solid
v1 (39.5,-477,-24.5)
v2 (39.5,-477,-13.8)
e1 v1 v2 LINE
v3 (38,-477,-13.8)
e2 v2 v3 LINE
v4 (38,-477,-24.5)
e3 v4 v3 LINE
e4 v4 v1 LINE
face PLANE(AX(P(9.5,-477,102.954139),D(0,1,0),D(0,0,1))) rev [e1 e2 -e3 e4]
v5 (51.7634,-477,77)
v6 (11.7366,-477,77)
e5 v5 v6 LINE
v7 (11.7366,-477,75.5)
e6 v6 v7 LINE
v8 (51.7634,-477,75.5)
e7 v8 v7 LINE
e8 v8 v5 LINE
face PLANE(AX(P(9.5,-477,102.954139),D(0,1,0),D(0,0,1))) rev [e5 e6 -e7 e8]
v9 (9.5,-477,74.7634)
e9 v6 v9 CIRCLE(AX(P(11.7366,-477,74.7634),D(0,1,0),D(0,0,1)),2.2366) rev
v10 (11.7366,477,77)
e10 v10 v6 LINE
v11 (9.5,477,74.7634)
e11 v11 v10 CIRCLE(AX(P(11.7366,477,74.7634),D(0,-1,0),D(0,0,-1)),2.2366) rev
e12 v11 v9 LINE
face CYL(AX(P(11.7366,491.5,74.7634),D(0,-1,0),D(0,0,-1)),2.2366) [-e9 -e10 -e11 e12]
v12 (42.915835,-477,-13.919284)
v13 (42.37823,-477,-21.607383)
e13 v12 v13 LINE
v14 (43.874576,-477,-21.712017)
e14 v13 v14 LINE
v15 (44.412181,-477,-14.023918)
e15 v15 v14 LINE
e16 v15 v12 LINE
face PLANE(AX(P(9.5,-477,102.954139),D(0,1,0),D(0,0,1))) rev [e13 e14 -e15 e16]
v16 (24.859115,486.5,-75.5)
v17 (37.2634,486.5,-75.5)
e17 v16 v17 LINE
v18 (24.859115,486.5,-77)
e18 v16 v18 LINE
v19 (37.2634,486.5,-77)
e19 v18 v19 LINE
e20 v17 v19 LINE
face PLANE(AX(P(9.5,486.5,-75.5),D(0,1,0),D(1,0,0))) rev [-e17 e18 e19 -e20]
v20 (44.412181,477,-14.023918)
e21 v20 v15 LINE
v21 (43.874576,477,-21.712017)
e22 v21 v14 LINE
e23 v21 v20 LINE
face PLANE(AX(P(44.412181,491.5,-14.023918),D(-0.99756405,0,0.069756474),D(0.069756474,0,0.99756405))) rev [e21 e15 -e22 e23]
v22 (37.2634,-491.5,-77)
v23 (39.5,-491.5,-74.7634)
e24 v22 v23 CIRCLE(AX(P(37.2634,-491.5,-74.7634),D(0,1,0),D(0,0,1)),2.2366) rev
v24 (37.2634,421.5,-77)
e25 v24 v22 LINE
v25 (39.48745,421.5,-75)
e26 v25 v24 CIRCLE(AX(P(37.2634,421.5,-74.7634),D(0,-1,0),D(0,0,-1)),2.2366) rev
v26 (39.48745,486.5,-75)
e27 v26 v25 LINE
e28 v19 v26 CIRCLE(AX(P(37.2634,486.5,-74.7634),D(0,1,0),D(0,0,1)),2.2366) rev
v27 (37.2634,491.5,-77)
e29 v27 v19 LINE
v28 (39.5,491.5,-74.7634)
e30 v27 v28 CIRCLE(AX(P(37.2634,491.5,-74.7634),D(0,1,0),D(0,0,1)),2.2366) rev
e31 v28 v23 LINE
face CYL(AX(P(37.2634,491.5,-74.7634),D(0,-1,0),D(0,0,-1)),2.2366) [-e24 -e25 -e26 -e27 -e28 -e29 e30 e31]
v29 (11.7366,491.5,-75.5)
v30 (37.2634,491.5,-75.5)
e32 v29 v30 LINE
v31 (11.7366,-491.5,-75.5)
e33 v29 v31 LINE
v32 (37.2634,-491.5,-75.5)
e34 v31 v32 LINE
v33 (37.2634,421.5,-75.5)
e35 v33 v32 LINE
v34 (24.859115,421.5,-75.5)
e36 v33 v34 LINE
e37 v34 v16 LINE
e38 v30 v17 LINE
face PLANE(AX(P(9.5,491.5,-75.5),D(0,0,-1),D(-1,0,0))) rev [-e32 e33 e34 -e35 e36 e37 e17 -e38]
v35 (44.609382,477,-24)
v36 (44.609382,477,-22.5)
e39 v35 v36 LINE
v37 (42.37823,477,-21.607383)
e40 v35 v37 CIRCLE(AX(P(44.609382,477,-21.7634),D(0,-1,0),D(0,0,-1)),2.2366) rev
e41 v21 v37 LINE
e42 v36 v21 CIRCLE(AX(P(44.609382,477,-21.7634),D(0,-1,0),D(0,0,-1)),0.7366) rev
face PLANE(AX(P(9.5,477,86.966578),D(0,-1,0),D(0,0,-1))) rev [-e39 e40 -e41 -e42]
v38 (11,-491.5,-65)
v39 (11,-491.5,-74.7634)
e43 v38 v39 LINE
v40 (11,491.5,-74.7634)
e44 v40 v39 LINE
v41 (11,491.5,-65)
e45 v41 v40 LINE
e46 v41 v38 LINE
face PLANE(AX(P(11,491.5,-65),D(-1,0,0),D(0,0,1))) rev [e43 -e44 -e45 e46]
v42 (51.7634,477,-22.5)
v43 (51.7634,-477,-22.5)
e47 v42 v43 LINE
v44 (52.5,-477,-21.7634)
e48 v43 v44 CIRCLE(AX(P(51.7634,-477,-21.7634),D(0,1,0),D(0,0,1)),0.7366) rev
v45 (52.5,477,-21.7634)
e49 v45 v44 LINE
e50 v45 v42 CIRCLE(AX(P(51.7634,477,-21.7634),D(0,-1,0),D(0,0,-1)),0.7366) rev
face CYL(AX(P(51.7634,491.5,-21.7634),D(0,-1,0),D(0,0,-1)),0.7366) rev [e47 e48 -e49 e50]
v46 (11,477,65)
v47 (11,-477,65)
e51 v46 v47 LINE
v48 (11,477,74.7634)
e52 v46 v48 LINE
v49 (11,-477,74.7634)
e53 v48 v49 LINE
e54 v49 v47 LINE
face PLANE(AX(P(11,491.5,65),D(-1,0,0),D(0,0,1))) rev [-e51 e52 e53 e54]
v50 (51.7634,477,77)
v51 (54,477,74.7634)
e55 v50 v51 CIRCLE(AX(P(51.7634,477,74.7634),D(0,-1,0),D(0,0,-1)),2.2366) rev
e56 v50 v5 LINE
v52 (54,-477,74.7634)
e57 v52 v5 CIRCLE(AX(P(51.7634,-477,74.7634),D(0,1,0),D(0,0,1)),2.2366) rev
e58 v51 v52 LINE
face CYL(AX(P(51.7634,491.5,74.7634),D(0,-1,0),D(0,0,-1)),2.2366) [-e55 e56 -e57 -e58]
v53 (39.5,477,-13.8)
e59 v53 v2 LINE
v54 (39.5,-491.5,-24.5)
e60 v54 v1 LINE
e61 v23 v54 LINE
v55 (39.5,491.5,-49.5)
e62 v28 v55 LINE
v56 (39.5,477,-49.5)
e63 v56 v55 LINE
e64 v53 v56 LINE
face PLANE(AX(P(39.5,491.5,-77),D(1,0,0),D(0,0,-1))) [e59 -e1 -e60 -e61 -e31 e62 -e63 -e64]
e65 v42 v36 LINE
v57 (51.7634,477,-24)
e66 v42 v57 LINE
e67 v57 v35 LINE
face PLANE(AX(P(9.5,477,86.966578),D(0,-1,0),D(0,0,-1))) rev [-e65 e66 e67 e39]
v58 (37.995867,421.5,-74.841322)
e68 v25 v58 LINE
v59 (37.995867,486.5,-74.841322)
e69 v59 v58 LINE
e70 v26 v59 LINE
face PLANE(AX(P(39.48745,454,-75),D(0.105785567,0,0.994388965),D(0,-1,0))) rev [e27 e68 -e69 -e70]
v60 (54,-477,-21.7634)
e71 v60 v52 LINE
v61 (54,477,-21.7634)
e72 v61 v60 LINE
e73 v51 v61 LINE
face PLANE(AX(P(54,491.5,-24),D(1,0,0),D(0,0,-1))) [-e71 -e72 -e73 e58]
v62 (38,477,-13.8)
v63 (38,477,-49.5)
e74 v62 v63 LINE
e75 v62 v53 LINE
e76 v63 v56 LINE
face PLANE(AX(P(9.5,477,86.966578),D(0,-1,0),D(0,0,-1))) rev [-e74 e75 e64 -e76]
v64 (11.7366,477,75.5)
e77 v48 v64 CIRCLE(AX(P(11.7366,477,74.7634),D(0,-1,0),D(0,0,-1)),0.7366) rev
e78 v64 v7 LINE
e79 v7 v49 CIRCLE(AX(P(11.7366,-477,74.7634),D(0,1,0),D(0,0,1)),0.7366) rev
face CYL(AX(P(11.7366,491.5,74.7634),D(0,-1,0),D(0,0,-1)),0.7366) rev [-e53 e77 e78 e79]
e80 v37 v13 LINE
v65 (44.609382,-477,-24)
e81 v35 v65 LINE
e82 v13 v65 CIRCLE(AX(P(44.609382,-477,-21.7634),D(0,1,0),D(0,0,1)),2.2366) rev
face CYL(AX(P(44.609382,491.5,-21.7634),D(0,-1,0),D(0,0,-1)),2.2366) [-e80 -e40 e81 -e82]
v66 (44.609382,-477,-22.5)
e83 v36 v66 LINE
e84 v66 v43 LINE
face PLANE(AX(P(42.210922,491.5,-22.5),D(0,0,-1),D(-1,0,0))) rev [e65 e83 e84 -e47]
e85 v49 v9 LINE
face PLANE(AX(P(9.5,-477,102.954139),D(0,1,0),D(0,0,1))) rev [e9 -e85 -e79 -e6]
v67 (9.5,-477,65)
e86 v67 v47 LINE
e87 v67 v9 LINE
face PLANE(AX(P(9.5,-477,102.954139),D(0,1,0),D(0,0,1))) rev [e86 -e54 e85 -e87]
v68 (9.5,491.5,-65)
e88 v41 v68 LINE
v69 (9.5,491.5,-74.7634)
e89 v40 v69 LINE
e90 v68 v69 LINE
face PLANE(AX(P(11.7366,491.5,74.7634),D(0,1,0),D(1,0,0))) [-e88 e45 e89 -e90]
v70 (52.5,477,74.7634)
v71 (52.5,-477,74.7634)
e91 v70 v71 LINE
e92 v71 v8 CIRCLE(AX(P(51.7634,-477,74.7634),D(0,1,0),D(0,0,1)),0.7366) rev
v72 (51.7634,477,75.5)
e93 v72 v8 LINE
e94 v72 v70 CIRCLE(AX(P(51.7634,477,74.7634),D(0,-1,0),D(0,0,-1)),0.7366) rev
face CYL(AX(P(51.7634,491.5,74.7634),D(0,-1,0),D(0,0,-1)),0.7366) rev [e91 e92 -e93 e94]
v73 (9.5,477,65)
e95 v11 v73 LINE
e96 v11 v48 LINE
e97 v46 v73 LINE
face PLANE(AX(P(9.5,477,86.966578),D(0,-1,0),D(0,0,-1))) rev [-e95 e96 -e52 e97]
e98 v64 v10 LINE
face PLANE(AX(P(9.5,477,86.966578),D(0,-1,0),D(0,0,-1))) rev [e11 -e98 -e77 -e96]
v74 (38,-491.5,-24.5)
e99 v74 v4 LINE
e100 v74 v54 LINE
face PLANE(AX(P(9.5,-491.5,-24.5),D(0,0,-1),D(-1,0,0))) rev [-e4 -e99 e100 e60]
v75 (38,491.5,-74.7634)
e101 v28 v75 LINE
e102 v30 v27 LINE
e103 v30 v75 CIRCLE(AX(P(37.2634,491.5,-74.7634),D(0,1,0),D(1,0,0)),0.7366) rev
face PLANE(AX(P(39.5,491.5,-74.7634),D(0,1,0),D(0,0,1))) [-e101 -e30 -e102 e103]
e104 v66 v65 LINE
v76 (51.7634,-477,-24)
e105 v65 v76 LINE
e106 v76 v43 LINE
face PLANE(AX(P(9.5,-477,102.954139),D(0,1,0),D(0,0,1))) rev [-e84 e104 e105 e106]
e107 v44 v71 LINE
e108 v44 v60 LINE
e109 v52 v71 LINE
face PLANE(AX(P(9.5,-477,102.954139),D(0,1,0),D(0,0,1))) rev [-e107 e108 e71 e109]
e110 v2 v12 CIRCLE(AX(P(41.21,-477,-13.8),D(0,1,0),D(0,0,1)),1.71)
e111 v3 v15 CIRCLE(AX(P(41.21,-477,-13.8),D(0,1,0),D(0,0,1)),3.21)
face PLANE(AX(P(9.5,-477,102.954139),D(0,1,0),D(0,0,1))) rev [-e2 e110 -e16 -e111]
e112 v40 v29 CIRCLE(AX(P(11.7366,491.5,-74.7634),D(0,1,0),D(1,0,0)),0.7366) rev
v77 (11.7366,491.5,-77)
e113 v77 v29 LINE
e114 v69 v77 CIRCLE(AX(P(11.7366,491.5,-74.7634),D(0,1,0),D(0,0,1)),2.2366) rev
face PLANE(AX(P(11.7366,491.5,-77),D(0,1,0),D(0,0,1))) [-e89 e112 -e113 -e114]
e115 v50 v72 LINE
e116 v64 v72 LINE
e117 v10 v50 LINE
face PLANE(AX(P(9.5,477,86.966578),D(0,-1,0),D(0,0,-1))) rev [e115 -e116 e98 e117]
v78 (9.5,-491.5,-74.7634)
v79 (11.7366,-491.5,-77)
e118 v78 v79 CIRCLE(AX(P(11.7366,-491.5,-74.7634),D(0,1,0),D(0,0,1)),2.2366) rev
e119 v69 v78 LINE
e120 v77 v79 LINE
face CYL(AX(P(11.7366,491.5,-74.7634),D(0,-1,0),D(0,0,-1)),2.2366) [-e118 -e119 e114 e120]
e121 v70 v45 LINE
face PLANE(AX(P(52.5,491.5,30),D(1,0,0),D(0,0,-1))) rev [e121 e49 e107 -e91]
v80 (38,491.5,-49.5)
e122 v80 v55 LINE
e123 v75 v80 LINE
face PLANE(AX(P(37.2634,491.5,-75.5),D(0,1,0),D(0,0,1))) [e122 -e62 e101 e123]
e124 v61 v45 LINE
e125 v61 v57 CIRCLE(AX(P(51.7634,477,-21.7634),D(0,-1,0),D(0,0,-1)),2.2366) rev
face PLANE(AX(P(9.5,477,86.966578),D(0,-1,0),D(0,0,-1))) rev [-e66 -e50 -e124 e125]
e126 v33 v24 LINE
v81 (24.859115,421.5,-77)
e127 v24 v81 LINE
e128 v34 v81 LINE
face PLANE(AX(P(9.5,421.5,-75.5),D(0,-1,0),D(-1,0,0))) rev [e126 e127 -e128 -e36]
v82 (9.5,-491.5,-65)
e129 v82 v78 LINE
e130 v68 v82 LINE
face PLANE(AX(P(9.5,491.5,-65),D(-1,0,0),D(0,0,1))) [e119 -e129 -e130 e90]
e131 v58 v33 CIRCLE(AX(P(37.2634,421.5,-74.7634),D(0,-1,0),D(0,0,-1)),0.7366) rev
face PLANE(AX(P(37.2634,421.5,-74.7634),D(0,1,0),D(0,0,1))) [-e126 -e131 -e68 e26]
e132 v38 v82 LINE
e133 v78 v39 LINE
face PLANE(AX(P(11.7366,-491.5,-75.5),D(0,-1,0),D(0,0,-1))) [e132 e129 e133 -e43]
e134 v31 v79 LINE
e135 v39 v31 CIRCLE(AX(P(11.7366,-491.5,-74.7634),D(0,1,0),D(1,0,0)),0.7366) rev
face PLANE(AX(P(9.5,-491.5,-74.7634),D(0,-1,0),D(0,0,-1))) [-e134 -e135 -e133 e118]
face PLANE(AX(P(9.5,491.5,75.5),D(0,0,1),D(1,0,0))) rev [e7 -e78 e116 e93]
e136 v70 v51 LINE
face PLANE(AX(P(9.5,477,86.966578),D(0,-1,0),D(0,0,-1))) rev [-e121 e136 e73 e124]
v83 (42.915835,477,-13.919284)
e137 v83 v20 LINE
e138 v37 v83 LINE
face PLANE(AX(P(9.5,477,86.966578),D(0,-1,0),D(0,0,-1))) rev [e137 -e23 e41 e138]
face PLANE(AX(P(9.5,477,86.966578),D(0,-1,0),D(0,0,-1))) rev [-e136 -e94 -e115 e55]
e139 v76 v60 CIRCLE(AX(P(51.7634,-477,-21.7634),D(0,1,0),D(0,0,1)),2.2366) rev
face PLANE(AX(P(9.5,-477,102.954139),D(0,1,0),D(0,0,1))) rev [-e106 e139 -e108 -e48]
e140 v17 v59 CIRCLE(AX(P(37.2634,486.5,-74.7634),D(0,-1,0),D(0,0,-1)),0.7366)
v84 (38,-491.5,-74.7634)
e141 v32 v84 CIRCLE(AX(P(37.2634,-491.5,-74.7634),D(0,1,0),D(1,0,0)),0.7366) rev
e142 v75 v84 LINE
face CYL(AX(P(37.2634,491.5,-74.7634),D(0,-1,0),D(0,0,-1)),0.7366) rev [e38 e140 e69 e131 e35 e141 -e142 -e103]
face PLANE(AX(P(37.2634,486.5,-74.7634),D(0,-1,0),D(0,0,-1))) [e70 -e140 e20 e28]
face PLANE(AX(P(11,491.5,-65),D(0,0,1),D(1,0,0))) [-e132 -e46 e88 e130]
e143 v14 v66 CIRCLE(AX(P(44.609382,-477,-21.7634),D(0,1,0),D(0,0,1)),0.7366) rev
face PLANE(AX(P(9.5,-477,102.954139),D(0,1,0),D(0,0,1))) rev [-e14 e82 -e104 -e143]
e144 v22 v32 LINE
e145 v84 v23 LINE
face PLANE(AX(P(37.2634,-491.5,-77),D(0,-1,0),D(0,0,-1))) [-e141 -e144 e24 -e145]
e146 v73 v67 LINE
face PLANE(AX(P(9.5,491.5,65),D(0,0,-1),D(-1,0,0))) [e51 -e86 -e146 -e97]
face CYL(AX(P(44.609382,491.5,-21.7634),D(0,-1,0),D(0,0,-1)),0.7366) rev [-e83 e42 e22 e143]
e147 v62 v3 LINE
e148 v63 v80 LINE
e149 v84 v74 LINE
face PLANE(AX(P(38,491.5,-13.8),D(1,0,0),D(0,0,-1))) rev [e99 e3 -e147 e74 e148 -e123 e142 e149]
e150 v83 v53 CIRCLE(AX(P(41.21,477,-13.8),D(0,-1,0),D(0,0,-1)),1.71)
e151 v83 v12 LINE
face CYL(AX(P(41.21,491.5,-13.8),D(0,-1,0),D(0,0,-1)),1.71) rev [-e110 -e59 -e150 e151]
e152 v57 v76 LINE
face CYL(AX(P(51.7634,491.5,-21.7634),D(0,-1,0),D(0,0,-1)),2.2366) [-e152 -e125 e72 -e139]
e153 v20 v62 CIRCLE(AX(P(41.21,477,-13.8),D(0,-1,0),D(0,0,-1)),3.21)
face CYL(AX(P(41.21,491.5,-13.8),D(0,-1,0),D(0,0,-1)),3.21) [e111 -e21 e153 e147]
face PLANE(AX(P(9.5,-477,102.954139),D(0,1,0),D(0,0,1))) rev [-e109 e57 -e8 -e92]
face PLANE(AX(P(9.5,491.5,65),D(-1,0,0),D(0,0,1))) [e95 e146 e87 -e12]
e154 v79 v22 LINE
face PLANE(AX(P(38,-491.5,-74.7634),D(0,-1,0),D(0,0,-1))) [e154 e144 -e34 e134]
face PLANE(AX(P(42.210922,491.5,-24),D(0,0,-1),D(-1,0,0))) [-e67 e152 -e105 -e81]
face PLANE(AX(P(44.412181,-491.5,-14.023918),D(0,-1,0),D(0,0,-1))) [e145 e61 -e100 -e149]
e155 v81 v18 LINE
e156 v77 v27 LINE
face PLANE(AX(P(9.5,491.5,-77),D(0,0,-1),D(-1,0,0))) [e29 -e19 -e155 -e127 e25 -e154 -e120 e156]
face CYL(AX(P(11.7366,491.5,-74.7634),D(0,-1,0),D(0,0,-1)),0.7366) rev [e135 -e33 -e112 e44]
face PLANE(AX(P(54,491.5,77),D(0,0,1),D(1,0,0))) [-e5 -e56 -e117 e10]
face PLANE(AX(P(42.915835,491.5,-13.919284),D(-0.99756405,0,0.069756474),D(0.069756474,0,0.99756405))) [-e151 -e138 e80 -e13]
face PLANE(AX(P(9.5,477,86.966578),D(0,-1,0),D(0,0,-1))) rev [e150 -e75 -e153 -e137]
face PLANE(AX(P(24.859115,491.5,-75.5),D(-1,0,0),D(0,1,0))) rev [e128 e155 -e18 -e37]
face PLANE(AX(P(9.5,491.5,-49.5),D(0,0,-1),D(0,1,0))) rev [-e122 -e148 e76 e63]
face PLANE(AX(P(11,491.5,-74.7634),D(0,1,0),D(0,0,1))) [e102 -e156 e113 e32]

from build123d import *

# Parameters (mm, degrees)
BASE_FLANGE1_DEPTH = 491.5
SKETCH3_W          = 127.454139471
SKETCH3_H          = 14.5
SKETCH3_W_2        = 136.466577612
CUT_EXTRUDE3_DEPTH = 500.481230879
CUT_EXTRUDE5_START = 421.5
CUT_EXTRUDE5_DEPTH = 65


# Read off the part's stored shape, not the designer's step: Cut-Extrude5
# Sheet-metal steps are written as plain solids
with BuildPart() as part:
    # Sketch1 → Base-Flange1 (new, symmetric)
    with BuildSketch(Plane(origin=(0, 0, 0), x_dir=(1, 0, 0), z_dir=(0, 1, 0))):
        with BuildLine():
            Line((9.5, 65), (9.5, 74.7634))
            ThreePointArc((9.5, 74.7634), (10.155084973, 76.344915027), (11.7366, 77))
            Line((11.7366, 77), (37.2634, 77))
            ThreePointArc((37.2634, 77), (38.844915027, 76.344915027), (39.5, 74.7634))
            Line((39.5, 74.7634), (39.5, 30))
            Line((39.5, 30), (39.5, 24))
            Line((39.5, 24), (39.5, 13.8))
            ThreePointArc((39.5, 13.8), (41.269678139, 12.091041686), (42.915834526, 13.91928357))
            Line((42.915834526, 13.91928357), (42.378230266, 21.607382671))
            ThreePointArc((42.378230266, 21.607382671), (42.973636332, 23.288757532), (44.609382021, 24))
            Line((44.609382021, 24), (51.7634, 24))
            ThreePointArc((51.7634, 24), (53.344915027, 23.344915027), (54, 21.7634))
            Line((54, 21.7634), (54, -30))
            Line((54, -30), (54, -74.7634))
            ThreePointArc((54, -74.7634), (53.344915027, -76.344915027), (51.7634, -77))
            Line((51.7634, -77), (39.5, -77))
            Line((39.5, -77), (11.7366, -77))
            ThreePointArc((11.7366, -77), (10.155084973, -76.344915027), (9.5, -74.7634))
            Line((9.5, -74.7634), (9.5, -65))
            Line((9.5, -65), (11, -65))
            Line((11, -65), (11, -74.7634))
            ThreePointArc((11, -74.7634), (11.215745145, -75.284254855), (11.7366, -75.5))
            Line((11.7366, -75.5), (39.5, -75.5))
            Line((39.5, -75.5), (51.7634, -75.5))
            ThreePointArc((51.7634, -75.5), (52.284254855, -75.284254855), (52.5, -74.7634))
            Line((52.5, -74.7634), (52.5, -30))
            Line((52.5, -30), (52.5, 21.7634))
            ThreePointArc((52.5, 21.7634), (52.284254855, 22.284254855), (51.7634, 22.5))
            Line((51.7634, 22.5), (44.609382021, 22.5))
            ThreePointArc((44.609382021, 22.5), (44.070666884, 22.265759992), (43.874576341, 21.712017381))
            Line((43.874576341, 21.712017381), (44.412180601, 14.023918281))
            ThreePointArc((44.412180601, 14.023918281), (41.322027384, 10.591955445), (38, 13.8))
            Line((38, 13.8), (38, 24))
            Line((38, 24), (38, 30))
            Line((38, 30), (38, 74.7634))
            ThreePointArc((38, 74.7634), (37.784254855, 75.284254855), (37.2634, 75.5))
            Line((37.2634, 75.5), (11.7366, 75.5))
            ThreePointArc((11.7366, 75.5), (11.215745145, 75.284254855), (11, 74.7634))
            Line((11, 74.7634), (11, 65))
            Line((11, 65), (9.5, 65))
        make_face()
    extrude(amount=BASE_FLANGE1_DEPTH, both=True)

    # Sketch3 → Cut-Extrude3 (cut, through all)
    with BuildSketch(Plane(origin=(54, 0, 0), x_dir=(0, 0, -1), z_dir=(1, 0, 0))):
        with Locations((-39.227069736, -484.25)):
            Rectangle(SKETCH3_W, SKETCH3_H)
        with Locations((-18.733288806, 484.25)):
            Rectangle(SKETCH3_W_2, SKETCH3_H)
    extrude(amount=-CUT_EXTRUDE3_DEPTH, mode=Mode.SUBTRACT)

    # Cut-Extrude5 outline → Cut-Extrude5 (cut)
    with BuildSketch(Plane(origin=(0, 0, 0), x_dir=(1, 0, 0), z_dir=(0, 1, 0)).offset(CUT_EXTRUDE5_START)):
        with BuildLine():
            Line((37.2634, 77), (24.859115026, 77))
            Line((24.859115026, 77), (24.859115026, 75.5))
            Line((24.859115026, 75.5), (37.2634, 75.5))
            ThreePointArc((37.2634, 75.5), (37.755935518, 75.311111898), (37.995866912, 74.841321649))
            Line((37.995866912, 74.841321649), (39.487450359, 75))
            ThreePointArc((39.487450359, 75), (38.758926663, 76.426463306), (37.2634, 77))
        make_face()
    extrude(amount=CUT_EXTRUDE5_DEPTH, mode=Mode.SUBTRACT)


solid = part.part
